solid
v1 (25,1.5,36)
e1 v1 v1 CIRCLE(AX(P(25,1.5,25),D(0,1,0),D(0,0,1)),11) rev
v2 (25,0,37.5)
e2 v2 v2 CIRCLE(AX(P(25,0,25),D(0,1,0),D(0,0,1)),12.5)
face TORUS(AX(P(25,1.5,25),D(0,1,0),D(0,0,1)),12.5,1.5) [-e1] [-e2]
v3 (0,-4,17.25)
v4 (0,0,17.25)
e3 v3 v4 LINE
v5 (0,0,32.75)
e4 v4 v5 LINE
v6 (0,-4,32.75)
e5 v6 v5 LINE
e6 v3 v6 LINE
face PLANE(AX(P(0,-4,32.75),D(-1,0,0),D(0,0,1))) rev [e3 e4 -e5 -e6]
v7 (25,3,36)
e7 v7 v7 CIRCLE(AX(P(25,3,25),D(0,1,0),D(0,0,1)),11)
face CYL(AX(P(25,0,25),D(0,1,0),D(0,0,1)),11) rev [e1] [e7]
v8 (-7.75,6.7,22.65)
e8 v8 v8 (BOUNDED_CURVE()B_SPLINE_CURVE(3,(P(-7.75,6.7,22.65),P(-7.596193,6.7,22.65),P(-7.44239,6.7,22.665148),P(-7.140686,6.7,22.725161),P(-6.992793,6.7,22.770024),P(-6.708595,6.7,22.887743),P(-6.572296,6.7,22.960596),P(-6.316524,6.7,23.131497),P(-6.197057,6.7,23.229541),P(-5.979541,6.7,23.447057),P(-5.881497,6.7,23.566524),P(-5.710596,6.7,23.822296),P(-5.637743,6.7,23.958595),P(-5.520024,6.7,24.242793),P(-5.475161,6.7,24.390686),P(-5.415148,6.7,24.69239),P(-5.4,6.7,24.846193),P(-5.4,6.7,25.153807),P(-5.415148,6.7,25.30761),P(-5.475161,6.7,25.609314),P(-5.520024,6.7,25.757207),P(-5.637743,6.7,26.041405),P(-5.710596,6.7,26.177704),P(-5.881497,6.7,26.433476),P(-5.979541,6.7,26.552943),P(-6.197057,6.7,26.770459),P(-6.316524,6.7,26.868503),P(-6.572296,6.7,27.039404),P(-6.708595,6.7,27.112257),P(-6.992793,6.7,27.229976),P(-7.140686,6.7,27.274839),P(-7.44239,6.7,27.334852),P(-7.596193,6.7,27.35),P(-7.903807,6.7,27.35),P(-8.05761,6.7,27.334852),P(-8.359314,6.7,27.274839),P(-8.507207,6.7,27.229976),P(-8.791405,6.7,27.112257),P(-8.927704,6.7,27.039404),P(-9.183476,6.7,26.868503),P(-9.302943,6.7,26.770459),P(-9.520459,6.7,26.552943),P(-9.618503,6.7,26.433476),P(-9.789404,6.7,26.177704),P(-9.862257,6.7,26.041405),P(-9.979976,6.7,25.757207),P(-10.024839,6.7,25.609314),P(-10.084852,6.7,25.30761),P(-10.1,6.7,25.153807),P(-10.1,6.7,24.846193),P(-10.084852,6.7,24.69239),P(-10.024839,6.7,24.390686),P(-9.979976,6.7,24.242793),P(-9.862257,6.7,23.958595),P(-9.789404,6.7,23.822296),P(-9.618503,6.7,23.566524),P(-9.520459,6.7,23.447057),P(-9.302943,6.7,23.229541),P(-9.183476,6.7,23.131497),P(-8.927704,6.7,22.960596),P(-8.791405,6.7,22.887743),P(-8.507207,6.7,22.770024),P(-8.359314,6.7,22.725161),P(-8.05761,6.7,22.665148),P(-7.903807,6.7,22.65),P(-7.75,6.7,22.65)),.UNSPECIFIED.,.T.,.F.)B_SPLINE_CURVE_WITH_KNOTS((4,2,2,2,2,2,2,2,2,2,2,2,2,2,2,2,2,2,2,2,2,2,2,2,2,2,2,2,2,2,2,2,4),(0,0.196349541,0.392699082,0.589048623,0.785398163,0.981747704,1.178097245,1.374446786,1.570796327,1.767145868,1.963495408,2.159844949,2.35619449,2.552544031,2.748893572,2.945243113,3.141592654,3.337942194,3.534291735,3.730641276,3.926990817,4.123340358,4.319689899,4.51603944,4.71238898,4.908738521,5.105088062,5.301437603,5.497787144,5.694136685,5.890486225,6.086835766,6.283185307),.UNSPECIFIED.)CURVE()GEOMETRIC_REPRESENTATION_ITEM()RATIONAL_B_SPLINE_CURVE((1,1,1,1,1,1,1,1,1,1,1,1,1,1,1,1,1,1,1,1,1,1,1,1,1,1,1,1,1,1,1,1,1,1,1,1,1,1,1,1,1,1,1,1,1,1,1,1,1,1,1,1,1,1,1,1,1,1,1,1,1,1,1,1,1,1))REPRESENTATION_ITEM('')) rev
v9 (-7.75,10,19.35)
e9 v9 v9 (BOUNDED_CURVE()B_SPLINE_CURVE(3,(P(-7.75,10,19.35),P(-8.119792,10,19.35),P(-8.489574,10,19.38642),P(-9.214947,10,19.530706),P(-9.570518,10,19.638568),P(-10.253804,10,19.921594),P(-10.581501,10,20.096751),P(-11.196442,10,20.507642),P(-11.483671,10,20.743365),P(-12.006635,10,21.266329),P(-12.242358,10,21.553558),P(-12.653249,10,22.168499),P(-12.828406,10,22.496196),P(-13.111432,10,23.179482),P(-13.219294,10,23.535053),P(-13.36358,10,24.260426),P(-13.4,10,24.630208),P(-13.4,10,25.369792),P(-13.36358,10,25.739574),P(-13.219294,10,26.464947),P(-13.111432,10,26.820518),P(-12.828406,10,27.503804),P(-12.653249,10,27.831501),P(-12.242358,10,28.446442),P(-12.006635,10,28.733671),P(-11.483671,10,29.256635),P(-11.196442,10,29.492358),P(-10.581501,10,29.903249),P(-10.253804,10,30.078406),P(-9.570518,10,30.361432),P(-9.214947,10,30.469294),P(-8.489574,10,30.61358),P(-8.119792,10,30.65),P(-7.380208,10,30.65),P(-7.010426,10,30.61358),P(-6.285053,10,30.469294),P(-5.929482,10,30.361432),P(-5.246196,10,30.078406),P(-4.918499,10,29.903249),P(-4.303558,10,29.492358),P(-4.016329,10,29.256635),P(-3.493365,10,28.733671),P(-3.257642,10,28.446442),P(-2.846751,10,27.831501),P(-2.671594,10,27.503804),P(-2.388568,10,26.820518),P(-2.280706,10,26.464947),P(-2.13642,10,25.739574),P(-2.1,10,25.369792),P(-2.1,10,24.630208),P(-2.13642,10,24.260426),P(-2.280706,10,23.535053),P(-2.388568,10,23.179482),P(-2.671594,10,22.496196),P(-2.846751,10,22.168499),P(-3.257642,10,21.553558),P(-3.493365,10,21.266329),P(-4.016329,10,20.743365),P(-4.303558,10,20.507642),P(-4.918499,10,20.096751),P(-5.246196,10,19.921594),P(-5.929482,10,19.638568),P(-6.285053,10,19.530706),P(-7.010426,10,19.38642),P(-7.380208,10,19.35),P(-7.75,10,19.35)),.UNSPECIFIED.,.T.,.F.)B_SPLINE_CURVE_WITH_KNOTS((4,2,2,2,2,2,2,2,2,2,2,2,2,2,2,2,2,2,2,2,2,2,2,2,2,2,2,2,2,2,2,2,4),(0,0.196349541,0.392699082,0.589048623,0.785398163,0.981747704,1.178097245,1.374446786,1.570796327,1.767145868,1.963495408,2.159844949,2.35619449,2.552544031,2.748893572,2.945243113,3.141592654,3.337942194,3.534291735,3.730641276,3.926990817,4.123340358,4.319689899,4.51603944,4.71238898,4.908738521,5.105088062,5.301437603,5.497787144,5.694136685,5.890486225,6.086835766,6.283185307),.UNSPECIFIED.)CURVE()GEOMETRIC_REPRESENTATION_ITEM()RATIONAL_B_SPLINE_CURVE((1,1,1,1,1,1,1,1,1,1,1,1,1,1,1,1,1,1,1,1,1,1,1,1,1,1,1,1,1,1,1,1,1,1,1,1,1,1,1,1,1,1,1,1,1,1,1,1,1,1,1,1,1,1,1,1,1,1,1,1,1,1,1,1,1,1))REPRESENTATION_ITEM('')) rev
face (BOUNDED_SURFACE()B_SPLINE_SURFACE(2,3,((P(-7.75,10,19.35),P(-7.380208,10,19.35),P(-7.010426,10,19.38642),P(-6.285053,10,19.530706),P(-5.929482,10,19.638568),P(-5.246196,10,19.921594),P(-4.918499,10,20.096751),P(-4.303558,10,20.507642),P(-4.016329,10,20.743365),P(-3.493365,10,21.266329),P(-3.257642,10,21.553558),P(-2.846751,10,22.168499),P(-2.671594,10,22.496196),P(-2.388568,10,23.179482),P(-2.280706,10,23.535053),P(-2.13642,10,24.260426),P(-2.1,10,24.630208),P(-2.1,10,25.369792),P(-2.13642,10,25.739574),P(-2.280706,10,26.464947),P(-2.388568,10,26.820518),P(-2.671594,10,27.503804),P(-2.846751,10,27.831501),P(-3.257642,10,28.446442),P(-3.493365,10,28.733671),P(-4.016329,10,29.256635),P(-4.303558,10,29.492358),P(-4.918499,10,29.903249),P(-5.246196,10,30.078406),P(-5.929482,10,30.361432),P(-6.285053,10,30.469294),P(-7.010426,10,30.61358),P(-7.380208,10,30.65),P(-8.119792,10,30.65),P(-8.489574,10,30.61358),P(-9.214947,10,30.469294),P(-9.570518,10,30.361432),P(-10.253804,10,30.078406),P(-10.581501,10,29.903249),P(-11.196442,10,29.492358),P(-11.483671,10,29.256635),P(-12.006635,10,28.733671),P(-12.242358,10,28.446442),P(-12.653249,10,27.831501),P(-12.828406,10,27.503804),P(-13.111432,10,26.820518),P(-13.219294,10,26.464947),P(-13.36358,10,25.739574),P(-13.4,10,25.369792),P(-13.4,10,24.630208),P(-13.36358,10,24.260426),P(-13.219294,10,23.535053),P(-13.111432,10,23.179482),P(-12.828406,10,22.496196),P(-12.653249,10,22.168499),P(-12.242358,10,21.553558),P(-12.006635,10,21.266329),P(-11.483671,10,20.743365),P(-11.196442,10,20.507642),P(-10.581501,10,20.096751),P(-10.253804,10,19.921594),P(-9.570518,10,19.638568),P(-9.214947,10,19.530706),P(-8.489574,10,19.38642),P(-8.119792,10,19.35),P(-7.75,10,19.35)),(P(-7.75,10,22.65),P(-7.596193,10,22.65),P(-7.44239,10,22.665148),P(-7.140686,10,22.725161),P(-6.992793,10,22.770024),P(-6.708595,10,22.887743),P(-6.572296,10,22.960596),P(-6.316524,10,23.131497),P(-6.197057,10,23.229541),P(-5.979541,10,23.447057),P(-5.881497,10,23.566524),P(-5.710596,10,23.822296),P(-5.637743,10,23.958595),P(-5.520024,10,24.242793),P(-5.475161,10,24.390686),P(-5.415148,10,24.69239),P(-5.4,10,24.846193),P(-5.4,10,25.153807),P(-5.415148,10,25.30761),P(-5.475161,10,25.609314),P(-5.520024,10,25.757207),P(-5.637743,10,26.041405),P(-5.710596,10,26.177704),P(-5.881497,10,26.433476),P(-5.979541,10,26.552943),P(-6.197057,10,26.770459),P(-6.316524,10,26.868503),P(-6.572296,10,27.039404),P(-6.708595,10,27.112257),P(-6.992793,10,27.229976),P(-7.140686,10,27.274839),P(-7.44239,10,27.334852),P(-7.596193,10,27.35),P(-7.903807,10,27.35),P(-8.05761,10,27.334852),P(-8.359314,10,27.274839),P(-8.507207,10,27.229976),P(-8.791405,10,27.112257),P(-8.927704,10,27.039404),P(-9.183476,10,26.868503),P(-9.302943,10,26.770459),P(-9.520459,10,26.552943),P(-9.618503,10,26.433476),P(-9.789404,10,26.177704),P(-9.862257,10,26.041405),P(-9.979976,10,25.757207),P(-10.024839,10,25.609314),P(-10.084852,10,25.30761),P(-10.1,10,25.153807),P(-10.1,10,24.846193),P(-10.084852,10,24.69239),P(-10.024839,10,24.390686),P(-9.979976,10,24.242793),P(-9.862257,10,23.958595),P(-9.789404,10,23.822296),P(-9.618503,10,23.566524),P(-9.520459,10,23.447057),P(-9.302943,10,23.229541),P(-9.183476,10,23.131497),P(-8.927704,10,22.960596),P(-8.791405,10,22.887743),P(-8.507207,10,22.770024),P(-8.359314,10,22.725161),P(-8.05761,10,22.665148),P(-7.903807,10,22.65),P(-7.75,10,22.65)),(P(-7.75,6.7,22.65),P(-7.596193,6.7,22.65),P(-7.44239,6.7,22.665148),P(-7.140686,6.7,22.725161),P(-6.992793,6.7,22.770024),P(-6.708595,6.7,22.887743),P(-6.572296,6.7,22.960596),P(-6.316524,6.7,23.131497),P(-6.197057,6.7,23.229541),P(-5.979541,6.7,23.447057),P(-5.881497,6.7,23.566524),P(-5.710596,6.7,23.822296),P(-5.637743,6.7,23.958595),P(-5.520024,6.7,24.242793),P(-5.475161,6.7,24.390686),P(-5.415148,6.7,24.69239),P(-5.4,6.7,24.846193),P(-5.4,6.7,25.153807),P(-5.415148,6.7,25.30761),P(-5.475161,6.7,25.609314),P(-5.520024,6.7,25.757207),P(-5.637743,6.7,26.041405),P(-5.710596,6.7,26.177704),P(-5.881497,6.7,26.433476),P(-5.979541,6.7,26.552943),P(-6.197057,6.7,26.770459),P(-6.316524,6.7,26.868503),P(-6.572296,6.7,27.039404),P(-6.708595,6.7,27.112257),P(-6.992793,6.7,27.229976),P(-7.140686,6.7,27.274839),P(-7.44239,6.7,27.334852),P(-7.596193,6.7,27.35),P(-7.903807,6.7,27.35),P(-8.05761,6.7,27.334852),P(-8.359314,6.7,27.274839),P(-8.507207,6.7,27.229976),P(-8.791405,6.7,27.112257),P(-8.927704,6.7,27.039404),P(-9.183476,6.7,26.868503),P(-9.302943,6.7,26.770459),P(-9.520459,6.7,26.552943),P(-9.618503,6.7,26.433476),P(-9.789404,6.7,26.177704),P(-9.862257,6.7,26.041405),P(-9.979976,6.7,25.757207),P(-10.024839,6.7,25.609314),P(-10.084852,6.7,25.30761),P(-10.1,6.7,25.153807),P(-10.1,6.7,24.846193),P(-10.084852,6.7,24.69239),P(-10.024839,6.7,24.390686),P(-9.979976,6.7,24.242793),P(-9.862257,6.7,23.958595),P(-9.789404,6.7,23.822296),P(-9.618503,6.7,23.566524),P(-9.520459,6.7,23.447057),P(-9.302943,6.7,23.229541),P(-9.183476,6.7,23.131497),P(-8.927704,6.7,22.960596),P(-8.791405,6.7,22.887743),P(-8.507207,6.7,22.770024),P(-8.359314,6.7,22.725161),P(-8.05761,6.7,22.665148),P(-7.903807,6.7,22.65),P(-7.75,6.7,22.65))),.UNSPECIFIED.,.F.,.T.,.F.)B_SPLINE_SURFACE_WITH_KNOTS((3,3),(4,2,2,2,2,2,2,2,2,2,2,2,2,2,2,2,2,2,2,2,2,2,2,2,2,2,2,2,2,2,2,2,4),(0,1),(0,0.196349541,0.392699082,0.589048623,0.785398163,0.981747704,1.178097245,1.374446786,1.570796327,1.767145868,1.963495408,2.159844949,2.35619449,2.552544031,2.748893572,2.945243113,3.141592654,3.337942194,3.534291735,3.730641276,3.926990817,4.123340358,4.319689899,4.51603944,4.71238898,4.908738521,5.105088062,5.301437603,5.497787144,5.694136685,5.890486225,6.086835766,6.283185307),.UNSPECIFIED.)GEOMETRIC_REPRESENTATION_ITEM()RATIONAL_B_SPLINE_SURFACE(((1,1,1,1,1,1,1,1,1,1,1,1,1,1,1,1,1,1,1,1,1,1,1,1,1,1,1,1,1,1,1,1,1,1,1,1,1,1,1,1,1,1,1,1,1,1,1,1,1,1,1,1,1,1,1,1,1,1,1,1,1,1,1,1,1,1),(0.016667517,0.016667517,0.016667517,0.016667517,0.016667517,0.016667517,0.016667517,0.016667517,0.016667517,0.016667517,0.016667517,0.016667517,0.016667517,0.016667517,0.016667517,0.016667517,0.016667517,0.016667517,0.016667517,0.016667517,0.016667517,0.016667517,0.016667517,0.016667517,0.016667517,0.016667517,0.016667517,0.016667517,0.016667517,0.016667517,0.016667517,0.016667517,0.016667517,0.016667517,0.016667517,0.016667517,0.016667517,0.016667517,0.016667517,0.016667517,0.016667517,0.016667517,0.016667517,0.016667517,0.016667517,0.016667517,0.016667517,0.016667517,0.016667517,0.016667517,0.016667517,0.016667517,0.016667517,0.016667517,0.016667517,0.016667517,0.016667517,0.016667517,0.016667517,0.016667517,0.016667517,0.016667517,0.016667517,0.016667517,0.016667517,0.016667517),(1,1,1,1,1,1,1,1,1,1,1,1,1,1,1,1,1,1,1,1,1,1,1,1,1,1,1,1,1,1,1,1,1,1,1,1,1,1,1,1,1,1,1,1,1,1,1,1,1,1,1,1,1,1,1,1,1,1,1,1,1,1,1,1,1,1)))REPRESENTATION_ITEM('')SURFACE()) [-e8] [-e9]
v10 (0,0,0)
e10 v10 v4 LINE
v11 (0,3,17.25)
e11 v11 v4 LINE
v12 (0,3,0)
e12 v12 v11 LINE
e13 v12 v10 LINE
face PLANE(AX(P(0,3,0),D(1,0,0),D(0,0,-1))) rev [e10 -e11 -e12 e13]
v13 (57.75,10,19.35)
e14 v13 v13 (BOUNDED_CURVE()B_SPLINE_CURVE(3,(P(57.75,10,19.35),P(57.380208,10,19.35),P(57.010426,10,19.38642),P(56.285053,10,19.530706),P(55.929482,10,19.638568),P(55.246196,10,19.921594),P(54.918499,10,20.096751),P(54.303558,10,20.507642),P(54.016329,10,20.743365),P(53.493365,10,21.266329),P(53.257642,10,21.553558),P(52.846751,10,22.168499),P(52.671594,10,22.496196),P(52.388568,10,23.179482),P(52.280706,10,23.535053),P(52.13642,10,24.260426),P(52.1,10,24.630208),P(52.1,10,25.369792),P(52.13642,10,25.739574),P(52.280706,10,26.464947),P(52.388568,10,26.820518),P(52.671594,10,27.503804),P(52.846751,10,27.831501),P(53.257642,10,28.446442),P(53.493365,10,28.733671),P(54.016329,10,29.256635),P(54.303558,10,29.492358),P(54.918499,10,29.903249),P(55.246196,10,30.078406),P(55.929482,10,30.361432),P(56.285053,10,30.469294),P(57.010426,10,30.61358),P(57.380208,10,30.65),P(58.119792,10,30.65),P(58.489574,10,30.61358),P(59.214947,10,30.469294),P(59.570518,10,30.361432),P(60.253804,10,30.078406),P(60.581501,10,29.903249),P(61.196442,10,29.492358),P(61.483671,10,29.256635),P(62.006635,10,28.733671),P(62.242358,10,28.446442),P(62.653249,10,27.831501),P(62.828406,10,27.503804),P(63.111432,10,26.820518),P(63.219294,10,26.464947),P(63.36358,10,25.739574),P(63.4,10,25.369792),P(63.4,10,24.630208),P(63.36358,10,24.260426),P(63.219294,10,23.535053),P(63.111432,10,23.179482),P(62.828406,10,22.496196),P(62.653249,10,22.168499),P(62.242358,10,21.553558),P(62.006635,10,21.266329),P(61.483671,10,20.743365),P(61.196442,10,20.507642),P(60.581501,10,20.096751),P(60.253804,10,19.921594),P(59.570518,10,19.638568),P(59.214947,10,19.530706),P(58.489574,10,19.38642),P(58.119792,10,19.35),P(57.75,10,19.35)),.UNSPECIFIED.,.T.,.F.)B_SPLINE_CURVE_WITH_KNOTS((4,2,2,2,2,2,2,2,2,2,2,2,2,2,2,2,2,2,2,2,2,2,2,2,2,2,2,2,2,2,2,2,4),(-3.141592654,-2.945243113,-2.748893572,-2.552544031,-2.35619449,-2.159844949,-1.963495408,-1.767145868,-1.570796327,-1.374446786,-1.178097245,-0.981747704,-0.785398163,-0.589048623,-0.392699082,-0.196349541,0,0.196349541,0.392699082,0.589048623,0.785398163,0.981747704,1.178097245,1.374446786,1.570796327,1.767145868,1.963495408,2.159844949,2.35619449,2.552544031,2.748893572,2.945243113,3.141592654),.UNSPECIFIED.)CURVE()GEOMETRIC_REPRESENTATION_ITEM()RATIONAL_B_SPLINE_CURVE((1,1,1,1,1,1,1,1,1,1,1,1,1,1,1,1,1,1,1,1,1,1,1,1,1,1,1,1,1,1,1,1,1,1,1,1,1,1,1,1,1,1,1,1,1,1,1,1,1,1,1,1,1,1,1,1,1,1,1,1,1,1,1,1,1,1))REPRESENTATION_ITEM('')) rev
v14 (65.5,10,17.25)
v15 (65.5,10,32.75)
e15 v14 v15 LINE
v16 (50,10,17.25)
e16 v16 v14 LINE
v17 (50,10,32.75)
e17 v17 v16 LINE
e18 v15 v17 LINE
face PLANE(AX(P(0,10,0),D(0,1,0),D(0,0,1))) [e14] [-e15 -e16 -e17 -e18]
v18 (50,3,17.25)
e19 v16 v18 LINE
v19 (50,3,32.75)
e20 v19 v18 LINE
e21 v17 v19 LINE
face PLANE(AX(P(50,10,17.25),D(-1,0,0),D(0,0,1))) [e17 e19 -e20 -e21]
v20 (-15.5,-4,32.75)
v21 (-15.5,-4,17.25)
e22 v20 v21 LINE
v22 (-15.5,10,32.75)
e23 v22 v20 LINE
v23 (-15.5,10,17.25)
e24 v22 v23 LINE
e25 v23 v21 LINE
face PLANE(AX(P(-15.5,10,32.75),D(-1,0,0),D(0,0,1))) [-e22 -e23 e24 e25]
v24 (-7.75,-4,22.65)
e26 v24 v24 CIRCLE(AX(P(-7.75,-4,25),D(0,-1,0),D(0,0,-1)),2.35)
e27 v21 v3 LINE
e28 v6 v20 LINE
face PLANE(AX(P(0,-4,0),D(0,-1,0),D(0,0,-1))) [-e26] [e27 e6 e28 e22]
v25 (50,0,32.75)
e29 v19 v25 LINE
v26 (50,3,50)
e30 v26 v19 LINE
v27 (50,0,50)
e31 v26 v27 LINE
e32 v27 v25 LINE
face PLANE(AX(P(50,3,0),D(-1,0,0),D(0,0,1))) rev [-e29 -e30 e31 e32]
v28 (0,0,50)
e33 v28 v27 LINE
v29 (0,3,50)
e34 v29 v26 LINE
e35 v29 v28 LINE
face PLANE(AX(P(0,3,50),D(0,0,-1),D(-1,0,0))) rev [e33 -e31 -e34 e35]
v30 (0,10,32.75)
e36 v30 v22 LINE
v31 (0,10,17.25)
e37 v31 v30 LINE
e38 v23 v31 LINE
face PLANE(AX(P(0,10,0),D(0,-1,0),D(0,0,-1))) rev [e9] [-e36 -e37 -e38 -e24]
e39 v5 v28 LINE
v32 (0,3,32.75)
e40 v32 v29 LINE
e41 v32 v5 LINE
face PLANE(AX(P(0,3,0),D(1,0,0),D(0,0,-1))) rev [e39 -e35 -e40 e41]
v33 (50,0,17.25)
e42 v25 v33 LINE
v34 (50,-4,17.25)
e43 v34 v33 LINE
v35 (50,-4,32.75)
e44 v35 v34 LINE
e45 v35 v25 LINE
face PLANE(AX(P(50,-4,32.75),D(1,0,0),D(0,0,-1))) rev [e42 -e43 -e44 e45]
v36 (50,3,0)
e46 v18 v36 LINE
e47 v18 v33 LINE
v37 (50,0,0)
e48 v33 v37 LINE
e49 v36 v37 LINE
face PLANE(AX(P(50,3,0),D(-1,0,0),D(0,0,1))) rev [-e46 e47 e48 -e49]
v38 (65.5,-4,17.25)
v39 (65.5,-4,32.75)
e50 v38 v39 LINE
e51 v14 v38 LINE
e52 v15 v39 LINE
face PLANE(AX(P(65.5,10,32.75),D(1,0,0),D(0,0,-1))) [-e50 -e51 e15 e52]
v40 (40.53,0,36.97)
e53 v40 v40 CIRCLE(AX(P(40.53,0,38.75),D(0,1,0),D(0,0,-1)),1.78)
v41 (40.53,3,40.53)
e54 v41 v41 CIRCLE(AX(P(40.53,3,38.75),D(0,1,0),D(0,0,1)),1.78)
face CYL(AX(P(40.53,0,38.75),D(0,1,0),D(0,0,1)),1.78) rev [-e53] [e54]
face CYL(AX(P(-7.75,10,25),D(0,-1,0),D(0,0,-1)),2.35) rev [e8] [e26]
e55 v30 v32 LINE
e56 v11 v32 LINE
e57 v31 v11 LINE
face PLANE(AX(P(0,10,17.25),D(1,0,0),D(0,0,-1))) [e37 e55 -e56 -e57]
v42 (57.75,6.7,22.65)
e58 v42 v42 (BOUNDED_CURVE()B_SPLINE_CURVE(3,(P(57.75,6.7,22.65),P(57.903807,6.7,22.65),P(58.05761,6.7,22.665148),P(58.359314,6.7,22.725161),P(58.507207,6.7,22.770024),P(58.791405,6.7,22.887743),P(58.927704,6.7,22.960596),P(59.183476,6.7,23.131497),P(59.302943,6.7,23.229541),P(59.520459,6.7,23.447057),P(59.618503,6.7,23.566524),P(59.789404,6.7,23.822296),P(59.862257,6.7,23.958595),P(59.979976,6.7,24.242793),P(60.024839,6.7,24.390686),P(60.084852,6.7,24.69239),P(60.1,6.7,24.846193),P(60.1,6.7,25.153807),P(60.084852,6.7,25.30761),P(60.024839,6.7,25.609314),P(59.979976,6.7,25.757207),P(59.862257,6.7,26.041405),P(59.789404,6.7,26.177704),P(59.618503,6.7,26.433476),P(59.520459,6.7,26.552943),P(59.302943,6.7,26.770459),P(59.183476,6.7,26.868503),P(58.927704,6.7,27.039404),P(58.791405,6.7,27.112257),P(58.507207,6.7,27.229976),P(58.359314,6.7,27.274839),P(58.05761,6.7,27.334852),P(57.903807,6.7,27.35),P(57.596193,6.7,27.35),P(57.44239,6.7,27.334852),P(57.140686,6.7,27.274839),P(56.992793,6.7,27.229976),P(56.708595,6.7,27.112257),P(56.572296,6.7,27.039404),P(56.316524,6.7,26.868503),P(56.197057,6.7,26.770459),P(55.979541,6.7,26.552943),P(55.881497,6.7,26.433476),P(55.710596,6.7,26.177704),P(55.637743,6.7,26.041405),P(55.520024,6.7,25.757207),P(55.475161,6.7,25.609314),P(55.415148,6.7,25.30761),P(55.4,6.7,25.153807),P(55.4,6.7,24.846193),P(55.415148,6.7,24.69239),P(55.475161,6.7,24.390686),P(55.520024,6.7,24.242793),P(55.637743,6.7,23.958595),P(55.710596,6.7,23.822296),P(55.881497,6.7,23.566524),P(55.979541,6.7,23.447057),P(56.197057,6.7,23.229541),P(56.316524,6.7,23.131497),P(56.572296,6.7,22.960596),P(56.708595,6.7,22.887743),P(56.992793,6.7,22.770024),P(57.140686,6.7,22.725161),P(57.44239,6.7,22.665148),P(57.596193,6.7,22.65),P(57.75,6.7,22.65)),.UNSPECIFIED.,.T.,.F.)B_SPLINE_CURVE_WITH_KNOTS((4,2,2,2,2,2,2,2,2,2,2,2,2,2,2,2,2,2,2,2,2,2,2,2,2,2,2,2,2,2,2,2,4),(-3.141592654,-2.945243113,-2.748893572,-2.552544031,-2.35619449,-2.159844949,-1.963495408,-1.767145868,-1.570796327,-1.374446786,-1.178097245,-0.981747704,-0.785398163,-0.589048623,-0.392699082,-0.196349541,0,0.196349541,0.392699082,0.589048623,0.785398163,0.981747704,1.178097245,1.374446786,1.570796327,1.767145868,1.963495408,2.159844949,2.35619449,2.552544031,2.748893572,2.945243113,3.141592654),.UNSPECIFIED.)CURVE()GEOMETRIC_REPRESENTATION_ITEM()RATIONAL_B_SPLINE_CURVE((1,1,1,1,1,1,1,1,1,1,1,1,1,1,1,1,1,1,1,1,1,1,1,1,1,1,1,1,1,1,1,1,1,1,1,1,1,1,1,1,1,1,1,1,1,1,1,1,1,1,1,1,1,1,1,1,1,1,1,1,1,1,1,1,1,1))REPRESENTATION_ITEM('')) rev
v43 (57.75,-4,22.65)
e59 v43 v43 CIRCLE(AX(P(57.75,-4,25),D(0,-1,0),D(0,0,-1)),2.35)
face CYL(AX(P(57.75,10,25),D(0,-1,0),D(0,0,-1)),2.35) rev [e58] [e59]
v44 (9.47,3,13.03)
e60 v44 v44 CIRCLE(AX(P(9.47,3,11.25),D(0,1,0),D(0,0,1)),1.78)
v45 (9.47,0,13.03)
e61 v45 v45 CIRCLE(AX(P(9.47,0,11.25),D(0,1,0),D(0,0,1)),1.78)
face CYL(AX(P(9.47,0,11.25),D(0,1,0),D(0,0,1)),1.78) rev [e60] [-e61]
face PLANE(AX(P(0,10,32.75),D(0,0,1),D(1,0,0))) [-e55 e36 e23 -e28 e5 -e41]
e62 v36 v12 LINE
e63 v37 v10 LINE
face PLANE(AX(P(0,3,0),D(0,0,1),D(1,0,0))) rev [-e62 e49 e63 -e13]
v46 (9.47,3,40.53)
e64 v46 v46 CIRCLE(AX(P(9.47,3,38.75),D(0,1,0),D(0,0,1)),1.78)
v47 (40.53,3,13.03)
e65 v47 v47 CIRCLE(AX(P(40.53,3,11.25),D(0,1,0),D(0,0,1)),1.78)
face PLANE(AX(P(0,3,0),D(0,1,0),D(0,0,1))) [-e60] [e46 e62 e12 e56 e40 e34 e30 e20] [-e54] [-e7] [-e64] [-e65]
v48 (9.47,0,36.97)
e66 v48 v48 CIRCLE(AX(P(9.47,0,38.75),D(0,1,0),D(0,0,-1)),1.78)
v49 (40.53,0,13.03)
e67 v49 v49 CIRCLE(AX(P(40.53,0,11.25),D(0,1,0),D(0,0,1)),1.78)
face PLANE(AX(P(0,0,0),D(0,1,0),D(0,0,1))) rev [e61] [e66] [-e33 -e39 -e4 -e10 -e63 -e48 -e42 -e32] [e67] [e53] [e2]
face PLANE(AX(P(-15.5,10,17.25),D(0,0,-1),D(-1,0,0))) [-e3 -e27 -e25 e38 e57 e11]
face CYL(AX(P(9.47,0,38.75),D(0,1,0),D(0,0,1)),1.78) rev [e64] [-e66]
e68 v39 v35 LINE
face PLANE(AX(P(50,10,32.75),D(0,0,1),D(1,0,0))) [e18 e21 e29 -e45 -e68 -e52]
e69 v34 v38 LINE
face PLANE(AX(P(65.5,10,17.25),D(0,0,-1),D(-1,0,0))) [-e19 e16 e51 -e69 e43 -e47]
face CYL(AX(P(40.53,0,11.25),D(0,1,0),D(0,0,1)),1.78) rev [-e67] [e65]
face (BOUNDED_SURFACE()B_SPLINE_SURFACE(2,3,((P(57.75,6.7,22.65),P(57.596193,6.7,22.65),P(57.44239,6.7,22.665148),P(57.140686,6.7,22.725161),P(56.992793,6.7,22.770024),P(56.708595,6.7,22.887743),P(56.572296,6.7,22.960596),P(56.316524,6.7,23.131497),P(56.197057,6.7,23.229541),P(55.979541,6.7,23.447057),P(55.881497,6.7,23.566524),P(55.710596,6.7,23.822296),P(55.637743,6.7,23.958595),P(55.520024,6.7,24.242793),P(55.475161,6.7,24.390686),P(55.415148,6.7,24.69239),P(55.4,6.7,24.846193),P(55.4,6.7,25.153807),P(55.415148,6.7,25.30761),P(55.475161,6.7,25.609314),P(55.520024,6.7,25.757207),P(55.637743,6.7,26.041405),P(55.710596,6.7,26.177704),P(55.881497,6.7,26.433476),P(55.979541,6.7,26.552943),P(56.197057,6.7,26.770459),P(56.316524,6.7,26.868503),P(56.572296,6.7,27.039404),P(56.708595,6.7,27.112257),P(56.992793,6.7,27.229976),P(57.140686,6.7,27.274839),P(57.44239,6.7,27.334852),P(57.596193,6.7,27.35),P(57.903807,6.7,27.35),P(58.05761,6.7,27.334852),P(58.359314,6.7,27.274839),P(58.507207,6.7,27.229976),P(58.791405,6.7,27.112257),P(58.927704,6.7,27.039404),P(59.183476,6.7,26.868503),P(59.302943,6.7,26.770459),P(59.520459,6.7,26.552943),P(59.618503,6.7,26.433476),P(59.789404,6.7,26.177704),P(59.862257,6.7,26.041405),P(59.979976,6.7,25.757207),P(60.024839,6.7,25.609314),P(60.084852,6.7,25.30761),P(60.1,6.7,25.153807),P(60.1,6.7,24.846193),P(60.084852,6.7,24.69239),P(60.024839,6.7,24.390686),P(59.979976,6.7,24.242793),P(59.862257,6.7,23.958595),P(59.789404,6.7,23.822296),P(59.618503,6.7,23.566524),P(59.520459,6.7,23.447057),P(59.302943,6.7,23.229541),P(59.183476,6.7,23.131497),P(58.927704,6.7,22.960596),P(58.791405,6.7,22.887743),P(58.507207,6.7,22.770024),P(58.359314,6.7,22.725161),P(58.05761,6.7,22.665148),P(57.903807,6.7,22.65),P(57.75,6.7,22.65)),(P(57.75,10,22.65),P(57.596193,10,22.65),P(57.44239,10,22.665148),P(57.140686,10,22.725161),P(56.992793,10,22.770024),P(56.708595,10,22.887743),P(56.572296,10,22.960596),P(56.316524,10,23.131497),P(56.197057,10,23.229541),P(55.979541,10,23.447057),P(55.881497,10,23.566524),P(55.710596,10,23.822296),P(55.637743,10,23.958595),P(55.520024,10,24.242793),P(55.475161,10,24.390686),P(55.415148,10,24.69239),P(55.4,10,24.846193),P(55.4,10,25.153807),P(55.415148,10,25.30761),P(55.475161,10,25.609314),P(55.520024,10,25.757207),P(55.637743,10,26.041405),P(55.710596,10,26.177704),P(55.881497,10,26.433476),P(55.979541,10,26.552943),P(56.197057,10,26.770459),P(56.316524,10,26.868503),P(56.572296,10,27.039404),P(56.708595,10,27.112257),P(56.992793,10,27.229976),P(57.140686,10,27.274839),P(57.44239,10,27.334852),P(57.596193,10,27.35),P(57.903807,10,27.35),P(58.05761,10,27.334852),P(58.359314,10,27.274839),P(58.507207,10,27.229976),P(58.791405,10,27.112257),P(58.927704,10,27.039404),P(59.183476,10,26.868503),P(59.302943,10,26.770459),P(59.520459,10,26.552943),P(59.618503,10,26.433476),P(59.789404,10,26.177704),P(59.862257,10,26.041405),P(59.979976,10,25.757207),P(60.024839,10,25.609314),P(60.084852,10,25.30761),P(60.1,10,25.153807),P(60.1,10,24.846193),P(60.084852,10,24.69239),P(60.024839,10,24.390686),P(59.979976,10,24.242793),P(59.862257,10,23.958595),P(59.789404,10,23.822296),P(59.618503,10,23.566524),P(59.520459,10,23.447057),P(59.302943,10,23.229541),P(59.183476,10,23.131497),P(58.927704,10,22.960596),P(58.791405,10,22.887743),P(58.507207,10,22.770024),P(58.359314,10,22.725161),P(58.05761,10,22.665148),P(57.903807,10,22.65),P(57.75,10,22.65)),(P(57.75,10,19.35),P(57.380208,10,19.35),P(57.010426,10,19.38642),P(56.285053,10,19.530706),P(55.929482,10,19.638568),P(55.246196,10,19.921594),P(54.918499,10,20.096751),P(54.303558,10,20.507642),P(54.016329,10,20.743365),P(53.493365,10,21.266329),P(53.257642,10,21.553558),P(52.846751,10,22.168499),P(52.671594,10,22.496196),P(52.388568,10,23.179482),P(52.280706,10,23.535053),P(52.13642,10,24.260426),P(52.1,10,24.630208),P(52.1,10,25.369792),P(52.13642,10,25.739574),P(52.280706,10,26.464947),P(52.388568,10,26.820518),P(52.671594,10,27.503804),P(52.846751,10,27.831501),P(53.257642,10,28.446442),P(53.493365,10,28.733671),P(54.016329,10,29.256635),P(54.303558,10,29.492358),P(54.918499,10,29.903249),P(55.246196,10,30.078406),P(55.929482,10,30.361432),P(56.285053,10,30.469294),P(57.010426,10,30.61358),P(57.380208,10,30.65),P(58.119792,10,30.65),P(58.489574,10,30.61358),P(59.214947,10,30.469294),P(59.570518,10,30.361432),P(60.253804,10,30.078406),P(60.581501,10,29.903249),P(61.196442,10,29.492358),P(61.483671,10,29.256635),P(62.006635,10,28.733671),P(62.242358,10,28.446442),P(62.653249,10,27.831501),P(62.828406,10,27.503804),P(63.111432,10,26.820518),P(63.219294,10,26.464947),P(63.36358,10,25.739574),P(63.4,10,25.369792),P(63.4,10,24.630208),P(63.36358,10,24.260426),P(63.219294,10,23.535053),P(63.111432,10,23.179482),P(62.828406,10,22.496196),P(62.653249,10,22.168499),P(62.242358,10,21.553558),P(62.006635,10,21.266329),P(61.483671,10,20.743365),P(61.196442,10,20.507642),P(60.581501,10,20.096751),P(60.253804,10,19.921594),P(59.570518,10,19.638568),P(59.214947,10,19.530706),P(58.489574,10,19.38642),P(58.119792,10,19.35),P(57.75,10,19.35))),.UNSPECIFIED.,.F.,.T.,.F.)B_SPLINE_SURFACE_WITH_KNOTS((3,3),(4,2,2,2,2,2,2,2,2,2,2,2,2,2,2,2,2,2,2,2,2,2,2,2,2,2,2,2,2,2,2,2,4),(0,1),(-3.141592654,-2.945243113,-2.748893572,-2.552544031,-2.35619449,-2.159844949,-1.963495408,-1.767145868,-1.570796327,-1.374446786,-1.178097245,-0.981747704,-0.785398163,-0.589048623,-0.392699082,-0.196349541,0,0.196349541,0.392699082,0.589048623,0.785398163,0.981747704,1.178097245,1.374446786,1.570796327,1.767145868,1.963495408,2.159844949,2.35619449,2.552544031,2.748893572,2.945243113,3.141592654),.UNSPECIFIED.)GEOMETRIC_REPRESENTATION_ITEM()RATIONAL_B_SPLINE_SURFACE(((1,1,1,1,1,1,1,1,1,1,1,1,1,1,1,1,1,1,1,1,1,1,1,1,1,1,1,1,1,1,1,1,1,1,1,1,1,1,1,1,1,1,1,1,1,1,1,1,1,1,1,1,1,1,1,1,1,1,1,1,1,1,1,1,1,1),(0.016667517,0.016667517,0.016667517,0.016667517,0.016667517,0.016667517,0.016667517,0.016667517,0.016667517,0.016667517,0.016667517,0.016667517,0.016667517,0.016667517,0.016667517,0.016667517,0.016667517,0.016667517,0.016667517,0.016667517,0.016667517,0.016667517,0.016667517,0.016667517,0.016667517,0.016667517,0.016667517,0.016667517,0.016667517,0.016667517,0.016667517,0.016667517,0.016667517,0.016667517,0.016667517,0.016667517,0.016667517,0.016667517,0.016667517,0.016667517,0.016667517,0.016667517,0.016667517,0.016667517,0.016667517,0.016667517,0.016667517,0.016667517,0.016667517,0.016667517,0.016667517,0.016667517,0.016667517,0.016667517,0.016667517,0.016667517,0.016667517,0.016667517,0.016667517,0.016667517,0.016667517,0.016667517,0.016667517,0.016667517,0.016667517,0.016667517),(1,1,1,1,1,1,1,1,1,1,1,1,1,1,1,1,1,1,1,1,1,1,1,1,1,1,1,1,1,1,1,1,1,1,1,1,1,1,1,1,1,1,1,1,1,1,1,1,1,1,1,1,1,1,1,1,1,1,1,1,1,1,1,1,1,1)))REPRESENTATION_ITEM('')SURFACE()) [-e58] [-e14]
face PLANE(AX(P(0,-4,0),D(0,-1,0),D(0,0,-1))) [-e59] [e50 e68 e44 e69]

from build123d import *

# Parameters (mm, degrees)
SKETCH1_W               = 50
SKETCH1_H               = 50
BOSS_EXTRUDE1_DEPTH     = 3
CUT_EXTRUDE1_DEPTH      = 71.774289117
CUT_EXTRUDE1_DEPTH_BACK = 71.774289117
SKETCH2_R               = 11
CUT_EXTRUDE2_DEPTH      = 71.774289117
CUT_EXTRUDE2_DEPTH_BACK = 71.774289117
SKETCH3_R               = 1.78
FILLET1_R               = 1.5
SKETCH4_W               = 15.5
SKETCH4_H               = 15.5
SKETCH4_R               = 2.35
BOSS_EXTRUDE3_DEPTH     = 10
BOSS_EXTRUDE4_START     = 4
SKETCH6_W               = 15.5
SKETCH6_H               = 15.5
SKETCH6_R               = 2.35
BOSS_EXTRUDE4_DEPTH     = 4
FILLET3_SIZE            = 3.3


with BuildPart() as part:
    # Sketch1 → Boss-Extrude1 (new body)
    with BuildSketch(Plane(origin=(0, 0, 0), x_dir=(1, 0, 0), z_dir=(0, 1, 0))):
        with Locations((25, -25)):
            Rectangle(SKETCH1_W, SKETCH1_H)
    extrude(amount=BOSS_EXTRUDE1_DEPTH)

    # Sketch2 → Cut-Extrude1 (cut, two sides: drawn at the far end of the back side and taken through both)
    with BuildSketch(Plane(origin=(0, 3, 0), x_dir=(1, 0, 0), z_dir=(0, 1, 0)).offset(-CUT_EXTRUDE1_DEPTH_BACK)):
        with Locations(Location((25, -25, 0), (0, 0, 270))):
            Circle(SKETCH2_R)
    extrude(amount=CUT_EXTRUDE1_DEPTH + CUT_EXTRUDE1_DEPTH_BACK, mode=Mode.SUBTRACT)

    # Sketch3 → Cut-Extrude2 (cut, two sides: drawn at the far end of the back side and taken through both)
    with BuildSketch(Plane(origin=(0, 3, 0), x_dir=(1, 0, 0), z_dir=(0, 1, 0)).offset(-CUT_EXTRUDE2_DEPTH_BACK)):
        with Locations(Location((9.47, -11.25, 0), (0, 0, 270))):
            Circle(SKETCH3_R)
        with Locations(Location((40.53, -11.25, 0), (0, 0, 270))):
            Circle(SKETCH3_R)
        with Locations(Location((40.53, -38.75, 0), (0, 0, 270))):
            Circle(SKETCH3_R)
        with Locations(Location((9.47, -38.75, 0), (0, 0, 270))):
            Circle(SKETCH3_R)
    extrude(amount=CUT_EXTRUDE2_DEPTH + CUT_EXTRUDE2_DEPTH_BACK, mode=Mode.SUBTRACT)

    # Fillet1
    fillet1_edges = [part.edges().sort_by_distance(p)[0] for p in [
        (25, 0, 14),
    ]]
    fillet(fillet1_edges, radius=FILLET1_R)

    # Sketch4 → Boss-Extrude3 (add)
    # profile 1 of 2: a face of its own
    with BuildSketch(Plane.XZ):
        with Locations((-7.75, 25)):
            Rectangle(SKETCH4_W, SKETCH4_H)
        with Locations(Location((-7.75, 25, 0), (0, 0, 270))):
            Circle(SKETCH4_R, mode=Mode.SUBTRACT)
    # profile 2 of 2: a face of its own
    with BuildSketch(Plane.XZ):
        with Locations((57.75, 25)):
            Rectangle(SKETCH4_W, SKETCH4_H)
        with Locations(Location((57.75, 25, 0), (0, 0, 270))):
            Circle(SKETCH4_R, mode=Mode.SUBTRACT)
    extrude(amount=-BOSS_EXTRUDE3_DEPTH)

    # Sketch6 → Boss-Extrude4 (add)
    # profile 1 of 2: a face of its own
    with BuildSketch(Plane.XZ.offset(BOSS_EXTRUDE4_START)):
        with Locations((-7.75, 25)):
            Rectangle(SKETCH6_W, SKETCH6_H)
        with Locations(Location((-7.75, 25, 0), (0, 0, 270))):
            Circle(SKETCH6_R, mode=Mode.SUBTRACT)
    # profile 2 of 2: a face of its own
    with BuildSketch(Plane.XZ.offset(BOSS_EXTRUDE4_START)):
        with Locations((57.75, 25)):
            Rectangle(SKETCH6_W, SKETCH6_H)
        with Locations(Location((57.75, 25, 0), (0, 0, 270))):
            Circle(SKETCH6_R, mode=Mode.SUBTRACT)
    extrude(amount=-BOSS_EXTRUDE4_DEPTH)

    # Fillet3
    # a fillet whose section is not a circle: 3.3 mm, written as the material it takes off along each edge
    with BuildSketch(Plane(origin=(-7.75, 10, 25), x_dir=(0, 0, -1), z_dir=(-1, 0, 0))) as fillet3_piece_1:
        with BuildLine():
            Bezier((2.35, FILLET3_SIZE), (2.35, 0), (2.35 + FILLET3_SIZE, 0), weights=[1, 0.016667517, 1])
            Line((2.35 + FILLET3_SIZE, 0), (2.35, 0))
            Line((2.35, 0), (2.35, FILLET3_SIZE))
        make_face()
    revolve(axis=Axis((-7.75, 10, 25), (0, -1, 0)), mode=Mode.SUBTRACT)
    with BuildSketch(Plane(origin=(57.75, 10, 25), x_dir=(0, 0, -1), z_dir=(-1, 0, 0))) as fillet3_piece_2:
        with BuildLine():
            Bezier((2.35, FILLET3_SIZE), (2.35, 0), (2.35 + FILLET3_SIZE, 0), weights=[1, 0.016667517, 1])
            Line((2.35 + FILLET3_SIZE, 0), (2.35, 0))
            Line((2.35, 0), (2.35, FILLET3_SIZE))
        make_face()
    revolve(axis=Axis((57.75, 10, 25), (0, -1, 0)), mode=Mode.SUBTRACT)


solid = part.part
